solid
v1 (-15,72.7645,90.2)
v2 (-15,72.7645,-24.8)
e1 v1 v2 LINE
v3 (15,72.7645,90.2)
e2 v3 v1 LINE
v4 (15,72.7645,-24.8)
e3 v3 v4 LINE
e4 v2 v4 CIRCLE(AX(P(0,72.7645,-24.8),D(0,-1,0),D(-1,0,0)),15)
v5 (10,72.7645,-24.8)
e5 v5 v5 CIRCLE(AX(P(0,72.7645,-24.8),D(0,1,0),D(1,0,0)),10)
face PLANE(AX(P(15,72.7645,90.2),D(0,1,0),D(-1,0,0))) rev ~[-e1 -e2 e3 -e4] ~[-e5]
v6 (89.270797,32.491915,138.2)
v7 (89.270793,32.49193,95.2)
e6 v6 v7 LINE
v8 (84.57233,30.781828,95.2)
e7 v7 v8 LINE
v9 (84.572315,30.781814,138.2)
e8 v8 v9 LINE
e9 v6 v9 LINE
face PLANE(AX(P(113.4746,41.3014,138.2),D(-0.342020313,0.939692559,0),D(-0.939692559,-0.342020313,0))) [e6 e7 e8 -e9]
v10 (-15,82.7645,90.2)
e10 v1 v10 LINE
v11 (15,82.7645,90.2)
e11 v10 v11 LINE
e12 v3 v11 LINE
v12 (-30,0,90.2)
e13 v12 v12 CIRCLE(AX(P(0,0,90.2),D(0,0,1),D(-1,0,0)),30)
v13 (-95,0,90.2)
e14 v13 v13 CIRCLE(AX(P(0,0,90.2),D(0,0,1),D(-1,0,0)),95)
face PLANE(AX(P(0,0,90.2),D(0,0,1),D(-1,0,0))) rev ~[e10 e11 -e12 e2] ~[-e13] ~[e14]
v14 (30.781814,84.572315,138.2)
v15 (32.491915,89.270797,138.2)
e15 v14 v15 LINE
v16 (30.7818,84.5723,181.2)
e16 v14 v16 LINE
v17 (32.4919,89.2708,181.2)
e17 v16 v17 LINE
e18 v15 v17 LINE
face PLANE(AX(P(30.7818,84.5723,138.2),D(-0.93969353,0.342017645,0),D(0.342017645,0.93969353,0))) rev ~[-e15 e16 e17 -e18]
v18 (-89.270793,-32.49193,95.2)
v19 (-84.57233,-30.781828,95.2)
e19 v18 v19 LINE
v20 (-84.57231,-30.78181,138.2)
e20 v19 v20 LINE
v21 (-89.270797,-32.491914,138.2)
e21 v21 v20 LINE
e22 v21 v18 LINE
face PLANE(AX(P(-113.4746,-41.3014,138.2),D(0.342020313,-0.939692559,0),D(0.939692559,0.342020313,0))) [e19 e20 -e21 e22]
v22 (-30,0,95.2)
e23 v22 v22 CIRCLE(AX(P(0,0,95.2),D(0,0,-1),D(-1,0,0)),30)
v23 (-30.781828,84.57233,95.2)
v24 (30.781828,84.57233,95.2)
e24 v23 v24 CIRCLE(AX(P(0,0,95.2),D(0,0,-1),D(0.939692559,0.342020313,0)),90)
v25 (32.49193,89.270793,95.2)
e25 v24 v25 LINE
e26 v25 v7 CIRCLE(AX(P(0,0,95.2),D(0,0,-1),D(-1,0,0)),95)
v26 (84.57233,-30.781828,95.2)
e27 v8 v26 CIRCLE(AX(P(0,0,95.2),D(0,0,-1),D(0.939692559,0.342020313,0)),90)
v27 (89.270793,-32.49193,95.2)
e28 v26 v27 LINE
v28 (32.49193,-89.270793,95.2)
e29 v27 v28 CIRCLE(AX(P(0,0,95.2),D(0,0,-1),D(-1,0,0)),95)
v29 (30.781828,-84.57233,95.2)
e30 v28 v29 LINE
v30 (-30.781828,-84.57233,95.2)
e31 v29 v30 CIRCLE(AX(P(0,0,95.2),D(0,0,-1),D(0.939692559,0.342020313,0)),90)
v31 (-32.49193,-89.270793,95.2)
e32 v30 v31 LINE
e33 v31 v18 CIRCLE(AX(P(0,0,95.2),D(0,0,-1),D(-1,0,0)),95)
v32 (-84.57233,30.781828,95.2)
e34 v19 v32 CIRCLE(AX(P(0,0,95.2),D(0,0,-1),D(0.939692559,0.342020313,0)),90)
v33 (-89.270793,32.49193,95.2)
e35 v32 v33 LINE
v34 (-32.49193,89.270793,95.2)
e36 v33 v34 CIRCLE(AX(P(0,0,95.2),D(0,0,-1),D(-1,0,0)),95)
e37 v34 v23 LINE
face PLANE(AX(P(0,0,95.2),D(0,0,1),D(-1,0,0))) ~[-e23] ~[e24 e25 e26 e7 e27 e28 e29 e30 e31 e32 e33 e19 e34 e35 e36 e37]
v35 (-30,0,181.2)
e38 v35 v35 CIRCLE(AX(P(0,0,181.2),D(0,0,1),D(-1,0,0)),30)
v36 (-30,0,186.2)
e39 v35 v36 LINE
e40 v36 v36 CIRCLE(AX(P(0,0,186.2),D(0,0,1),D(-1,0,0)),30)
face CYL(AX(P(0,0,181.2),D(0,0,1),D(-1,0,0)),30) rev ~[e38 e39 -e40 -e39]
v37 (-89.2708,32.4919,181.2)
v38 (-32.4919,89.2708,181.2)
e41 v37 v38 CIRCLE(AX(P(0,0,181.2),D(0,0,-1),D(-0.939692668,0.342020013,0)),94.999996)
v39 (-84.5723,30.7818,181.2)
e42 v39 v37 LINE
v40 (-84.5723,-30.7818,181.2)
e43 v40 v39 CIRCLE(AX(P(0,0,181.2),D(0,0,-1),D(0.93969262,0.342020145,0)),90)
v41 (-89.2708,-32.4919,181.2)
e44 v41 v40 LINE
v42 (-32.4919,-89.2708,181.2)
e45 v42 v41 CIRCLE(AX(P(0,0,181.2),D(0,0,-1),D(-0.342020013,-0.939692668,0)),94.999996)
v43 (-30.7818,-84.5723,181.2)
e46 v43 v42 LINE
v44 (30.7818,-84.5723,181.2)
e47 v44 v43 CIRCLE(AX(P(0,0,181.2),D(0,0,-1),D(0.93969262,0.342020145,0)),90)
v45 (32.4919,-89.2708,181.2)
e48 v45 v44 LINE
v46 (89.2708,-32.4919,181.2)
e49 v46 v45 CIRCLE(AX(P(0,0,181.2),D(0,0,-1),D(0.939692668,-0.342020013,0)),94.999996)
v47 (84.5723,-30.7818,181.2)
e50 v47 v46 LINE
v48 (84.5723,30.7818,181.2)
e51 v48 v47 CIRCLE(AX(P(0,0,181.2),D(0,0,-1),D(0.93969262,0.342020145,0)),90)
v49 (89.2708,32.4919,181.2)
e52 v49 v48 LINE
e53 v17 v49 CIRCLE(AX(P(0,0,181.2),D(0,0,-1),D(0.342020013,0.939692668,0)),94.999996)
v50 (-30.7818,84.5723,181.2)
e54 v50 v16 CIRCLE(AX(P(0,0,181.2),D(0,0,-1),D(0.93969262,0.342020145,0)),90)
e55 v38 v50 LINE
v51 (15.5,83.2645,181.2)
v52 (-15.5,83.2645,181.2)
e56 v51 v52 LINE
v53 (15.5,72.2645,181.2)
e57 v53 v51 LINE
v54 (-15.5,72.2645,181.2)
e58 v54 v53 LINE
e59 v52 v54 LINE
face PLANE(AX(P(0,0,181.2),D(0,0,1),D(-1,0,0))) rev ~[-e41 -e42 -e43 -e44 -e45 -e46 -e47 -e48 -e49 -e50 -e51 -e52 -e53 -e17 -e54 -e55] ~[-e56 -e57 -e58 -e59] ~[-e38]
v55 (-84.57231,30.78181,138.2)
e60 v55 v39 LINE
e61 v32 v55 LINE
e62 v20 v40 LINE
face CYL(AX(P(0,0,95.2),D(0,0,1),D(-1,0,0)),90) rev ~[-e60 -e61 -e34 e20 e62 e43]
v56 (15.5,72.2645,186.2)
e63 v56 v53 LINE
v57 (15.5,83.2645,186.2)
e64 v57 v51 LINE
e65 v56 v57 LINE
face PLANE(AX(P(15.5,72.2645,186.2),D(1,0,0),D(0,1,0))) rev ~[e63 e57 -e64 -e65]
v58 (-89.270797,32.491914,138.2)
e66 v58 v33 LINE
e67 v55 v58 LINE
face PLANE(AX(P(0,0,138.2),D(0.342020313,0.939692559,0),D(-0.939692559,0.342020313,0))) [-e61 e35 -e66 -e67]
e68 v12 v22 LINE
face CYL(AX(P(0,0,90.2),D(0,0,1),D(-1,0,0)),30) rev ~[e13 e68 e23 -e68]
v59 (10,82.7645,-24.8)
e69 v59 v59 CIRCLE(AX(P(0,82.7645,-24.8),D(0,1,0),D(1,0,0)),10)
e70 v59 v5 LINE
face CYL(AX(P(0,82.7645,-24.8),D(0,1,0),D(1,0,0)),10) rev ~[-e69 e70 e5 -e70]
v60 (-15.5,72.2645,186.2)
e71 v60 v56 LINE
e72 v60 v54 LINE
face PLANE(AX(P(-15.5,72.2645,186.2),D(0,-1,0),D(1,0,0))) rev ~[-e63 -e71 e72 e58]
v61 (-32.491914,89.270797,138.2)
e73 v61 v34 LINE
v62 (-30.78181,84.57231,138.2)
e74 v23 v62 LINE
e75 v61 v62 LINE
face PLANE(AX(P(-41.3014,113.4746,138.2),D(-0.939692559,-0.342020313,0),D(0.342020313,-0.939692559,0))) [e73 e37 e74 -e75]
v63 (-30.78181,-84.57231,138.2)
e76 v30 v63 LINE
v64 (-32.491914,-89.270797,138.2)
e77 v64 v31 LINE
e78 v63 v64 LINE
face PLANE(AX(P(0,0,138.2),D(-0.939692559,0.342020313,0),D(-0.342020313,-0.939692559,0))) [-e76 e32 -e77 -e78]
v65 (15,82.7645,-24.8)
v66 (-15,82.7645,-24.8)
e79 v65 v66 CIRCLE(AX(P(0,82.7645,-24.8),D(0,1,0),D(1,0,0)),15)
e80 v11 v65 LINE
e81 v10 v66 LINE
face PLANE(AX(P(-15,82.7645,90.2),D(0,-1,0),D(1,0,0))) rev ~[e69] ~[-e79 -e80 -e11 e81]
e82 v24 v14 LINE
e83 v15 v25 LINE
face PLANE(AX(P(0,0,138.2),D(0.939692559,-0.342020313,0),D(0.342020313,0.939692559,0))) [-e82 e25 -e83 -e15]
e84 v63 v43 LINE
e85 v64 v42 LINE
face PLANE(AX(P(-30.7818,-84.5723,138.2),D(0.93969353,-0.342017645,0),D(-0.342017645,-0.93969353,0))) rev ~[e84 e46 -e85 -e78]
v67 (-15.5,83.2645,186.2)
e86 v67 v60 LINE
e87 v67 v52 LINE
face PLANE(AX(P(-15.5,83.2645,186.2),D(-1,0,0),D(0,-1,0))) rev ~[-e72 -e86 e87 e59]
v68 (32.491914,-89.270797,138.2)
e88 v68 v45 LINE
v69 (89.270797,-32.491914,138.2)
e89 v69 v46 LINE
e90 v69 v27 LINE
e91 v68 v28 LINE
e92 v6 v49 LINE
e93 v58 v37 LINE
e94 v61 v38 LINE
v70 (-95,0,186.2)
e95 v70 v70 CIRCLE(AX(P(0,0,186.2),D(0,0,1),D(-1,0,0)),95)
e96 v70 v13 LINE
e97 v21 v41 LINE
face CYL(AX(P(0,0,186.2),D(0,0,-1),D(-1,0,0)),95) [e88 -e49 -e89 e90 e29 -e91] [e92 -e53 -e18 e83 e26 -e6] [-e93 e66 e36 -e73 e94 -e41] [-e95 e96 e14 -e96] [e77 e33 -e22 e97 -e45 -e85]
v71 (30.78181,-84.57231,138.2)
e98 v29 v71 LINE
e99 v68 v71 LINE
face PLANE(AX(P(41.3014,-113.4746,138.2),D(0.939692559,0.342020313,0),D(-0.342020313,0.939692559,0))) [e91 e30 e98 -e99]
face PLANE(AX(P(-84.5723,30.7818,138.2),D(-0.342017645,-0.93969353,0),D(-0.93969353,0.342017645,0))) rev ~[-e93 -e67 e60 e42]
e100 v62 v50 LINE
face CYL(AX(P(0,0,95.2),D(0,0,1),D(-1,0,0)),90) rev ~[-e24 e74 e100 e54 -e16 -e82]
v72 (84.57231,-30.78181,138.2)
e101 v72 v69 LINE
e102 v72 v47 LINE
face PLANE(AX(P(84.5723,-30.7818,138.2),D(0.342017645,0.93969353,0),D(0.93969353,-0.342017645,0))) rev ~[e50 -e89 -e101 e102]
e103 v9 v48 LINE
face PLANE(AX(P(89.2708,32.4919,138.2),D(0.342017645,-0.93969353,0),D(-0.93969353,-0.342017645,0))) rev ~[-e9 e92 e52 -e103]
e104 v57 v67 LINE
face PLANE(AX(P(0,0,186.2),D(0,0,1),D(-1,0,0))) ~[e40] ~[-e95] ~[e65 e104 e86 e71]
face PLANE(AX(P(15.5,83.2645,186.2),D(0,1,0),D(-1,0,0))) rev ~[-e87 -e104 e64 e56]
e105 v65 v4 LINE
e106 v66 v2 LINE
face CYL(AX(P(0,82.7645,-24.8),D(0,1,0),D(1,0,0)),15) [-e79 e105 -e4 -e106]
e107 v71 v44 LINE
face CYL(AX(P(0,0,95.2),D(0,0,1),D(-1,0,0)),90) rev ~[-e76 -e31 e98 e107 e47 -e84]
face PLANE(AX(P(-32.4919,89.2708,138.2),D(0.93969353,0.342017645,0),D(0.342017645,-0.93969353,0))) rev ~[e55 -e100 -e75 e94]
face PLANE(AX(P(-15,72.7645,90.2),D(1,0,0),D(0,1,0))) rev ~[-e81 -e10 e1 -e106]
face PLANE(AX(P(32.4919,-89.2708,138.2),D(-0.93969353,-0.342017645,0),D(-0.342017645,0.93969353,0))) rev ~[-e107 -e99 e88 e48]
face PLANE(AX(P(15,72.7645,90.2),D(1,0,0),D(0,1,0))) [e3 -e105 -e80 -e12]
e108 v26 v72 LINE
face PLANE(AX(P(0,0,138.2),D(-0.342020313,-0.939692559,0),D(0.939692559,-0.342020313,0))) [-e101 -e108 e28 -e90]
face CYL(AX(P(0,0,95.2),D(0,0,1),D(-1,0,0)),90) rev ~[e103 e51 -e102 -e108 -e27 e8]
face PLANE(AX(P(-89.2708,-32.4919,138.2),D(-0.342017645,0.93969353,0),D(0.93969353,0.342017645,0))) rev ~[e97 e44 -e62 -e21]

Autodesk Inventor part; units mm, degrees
ref_plane "YZ Plane" through (0, 0, 0) normal (1, 0, 0) x (0, 1, 0)
ref_plane "XZ Plane" through (0, 0, 0) normal (0, 1, 0) x (-1, 0, 0)
ref_plane "XY Plane" through (0, 0, 0) normal (0, 0, 1) x (1, 0, 0)
sketch "Эскиз1" plane through (0, 0, 0) normal (0, 1, 0) x (-1, 0, 0)
  line L0 (30, 181.2) -> (30, 186.2)
  line L1 (30, 186.2) -> (95, 186.2)
  line L2 (95, 186.2) -> (95, 90.2)
  line L3 (95, 90.2) -> (30, 90.2)
  line L4 (30, 90.2) -> (30, 95.2)
  line L5 (30, 95.2) -> (90, 95.2)
  line L6 (90, 95.2) -> (90, 181.2)
  line L7 (90, 181.2) -> (30, 181.2)
  line L8 (0, -115.5707) -> (0, 259.8393)
  line L9 (70, 181.2) -> (-70, 181.2) projected
  point P0 (0, 0)
  dimension "d0" = 5
  dimension "d1" = 5
  dimension "d2" = 5
  dimension "d3" = 86
  dimension "d4" = 180
  dimension "d5" = 60
revolve "Вращение1" add sketch "Эскиз1" angle 360 about axis through (0, 0, -115.5707) along (0, 0, 1)
sketch "Эскиз2" plane through (0, 0, 186.2) normal (0, 0, 1) x (1, 0, 0)
  line L0 (-15, 72.7645) -> (-15, 82.7645) projected
  line L1 (15, 82.7645) -> (-15, 82.7645) projected
  line L2 (15, 72.7645) -> (15, 82.7645) projected
  line L3 (-15, 72.7645) -> (15, 72.7645) projected
  line L4 (-15.5, 83.2645) -> (-15.5, 72.2645)
  line L5 (-15.5, 72.2645) -> (15.5, 72.2645)
  line L6 (15.5, 72.2645) -> (15.5, 83.2645)
  line L7 (15.5, 83.2645) -> (-15.5, 83.2645)
  point P0 (0, 0)
  dimension "d7" = 0.5
extrude "Выдавливание1" cut sketch "Эскиз2" against normal blind 7 contours L0 L1 L2 L3 | L7 L6 L5 L4
sketch "Эскиз3" plane through (0, 0, 90.2) normal (0, 0, -1) x (-1, 0, 0)
  line L0 (15, 82.7645) -> (-15, 82.7645) projected
  line L1 (-15, 72.7645) -> (15, 72.7645) projected
  line L2 (15, 72.7645) -> (15, 82.7645) projected
  line L3 (-15, 72.7645) -> (-15, 82.7645) projected
  point P0 (0, 0)
extrude "Выдавливание2" add sketch "Эскиз3" along normal blind 130
sketch "Эскиз4" plane through (-15, 82.7645, 90.2) normal (0, 1, 0) x (1, 0, 0)
  line L0 (30, 0) -> (30, 130) projected
  line L1 (0, 0) -> (0, 130) projected
  arc A0 (30, 115) -> (0, 115) centre (15, 115) ccw
  line L2 (30, 130) -> (0, 130) projected
  circle A1 centre (15, 115) radius 10
  point P0 (15, 90.2)
  point P1 (15, 130)
  dimension "d15" = 20
extrude "Выдавливание3" cut sketch "Эскиз4" against normal blind 24.5
ref_plane "РабПлоскость1" through (0, 0, 138.2) normal (0, 0, -1) x (-1, 0, 0)
sketch "Эскиз5" plane through (0, 0, 138.2) normal (0, 0, -1) x (-1, 0, 0)
  line L0 (0, 0) -> (-41.3014, 113.4746)
  line L1 (-41.3014, 113.4746) -> (-113.4746, 41.3014)
  line L2 (-113.4746, 41.3014) -> (0, 0)
  line L3 (0, 0) -> (-77.388, 77.388) construction
  line L4 (0, 0) -> (-129.096, 0) construction
  dimension "d18" = 50
  dimension "d19" = 45
extrude "Выдавливание4" cut sketch "Эскиз5" along normal up to surface (43 mm away)
sketch "Эскиз6" plane through (0, 0, 138.2) normal (0, 0, -1) x (-1, 0, 0)
  arc A0 (-30.7818, 84.5723) -> (-84.5723, 30.7818) centre (0, 0) ccw projected
  line L0 (-30.7818, 84.5723) -> (-32.4919, 89.2708) projected
  arc A1 (-32.4919, 89.2708) -> (-89.2708, 32.4919) centre (0, 0) ccw projected
  line L1 (-89.2708, 32.4919) -> (-84.5723, 30.7818) projected
extrude "Выдавливание5" cut sketch "Эскиз6" against normal up to surface (43 mm away)
pattern_circular "Круговой массив1" count 4 over 360 about axis through (0, 0, 138.2) along (0, 0, -1) of "Выдавливание4", "Выдавливание5"
properties part number "outer_part"
